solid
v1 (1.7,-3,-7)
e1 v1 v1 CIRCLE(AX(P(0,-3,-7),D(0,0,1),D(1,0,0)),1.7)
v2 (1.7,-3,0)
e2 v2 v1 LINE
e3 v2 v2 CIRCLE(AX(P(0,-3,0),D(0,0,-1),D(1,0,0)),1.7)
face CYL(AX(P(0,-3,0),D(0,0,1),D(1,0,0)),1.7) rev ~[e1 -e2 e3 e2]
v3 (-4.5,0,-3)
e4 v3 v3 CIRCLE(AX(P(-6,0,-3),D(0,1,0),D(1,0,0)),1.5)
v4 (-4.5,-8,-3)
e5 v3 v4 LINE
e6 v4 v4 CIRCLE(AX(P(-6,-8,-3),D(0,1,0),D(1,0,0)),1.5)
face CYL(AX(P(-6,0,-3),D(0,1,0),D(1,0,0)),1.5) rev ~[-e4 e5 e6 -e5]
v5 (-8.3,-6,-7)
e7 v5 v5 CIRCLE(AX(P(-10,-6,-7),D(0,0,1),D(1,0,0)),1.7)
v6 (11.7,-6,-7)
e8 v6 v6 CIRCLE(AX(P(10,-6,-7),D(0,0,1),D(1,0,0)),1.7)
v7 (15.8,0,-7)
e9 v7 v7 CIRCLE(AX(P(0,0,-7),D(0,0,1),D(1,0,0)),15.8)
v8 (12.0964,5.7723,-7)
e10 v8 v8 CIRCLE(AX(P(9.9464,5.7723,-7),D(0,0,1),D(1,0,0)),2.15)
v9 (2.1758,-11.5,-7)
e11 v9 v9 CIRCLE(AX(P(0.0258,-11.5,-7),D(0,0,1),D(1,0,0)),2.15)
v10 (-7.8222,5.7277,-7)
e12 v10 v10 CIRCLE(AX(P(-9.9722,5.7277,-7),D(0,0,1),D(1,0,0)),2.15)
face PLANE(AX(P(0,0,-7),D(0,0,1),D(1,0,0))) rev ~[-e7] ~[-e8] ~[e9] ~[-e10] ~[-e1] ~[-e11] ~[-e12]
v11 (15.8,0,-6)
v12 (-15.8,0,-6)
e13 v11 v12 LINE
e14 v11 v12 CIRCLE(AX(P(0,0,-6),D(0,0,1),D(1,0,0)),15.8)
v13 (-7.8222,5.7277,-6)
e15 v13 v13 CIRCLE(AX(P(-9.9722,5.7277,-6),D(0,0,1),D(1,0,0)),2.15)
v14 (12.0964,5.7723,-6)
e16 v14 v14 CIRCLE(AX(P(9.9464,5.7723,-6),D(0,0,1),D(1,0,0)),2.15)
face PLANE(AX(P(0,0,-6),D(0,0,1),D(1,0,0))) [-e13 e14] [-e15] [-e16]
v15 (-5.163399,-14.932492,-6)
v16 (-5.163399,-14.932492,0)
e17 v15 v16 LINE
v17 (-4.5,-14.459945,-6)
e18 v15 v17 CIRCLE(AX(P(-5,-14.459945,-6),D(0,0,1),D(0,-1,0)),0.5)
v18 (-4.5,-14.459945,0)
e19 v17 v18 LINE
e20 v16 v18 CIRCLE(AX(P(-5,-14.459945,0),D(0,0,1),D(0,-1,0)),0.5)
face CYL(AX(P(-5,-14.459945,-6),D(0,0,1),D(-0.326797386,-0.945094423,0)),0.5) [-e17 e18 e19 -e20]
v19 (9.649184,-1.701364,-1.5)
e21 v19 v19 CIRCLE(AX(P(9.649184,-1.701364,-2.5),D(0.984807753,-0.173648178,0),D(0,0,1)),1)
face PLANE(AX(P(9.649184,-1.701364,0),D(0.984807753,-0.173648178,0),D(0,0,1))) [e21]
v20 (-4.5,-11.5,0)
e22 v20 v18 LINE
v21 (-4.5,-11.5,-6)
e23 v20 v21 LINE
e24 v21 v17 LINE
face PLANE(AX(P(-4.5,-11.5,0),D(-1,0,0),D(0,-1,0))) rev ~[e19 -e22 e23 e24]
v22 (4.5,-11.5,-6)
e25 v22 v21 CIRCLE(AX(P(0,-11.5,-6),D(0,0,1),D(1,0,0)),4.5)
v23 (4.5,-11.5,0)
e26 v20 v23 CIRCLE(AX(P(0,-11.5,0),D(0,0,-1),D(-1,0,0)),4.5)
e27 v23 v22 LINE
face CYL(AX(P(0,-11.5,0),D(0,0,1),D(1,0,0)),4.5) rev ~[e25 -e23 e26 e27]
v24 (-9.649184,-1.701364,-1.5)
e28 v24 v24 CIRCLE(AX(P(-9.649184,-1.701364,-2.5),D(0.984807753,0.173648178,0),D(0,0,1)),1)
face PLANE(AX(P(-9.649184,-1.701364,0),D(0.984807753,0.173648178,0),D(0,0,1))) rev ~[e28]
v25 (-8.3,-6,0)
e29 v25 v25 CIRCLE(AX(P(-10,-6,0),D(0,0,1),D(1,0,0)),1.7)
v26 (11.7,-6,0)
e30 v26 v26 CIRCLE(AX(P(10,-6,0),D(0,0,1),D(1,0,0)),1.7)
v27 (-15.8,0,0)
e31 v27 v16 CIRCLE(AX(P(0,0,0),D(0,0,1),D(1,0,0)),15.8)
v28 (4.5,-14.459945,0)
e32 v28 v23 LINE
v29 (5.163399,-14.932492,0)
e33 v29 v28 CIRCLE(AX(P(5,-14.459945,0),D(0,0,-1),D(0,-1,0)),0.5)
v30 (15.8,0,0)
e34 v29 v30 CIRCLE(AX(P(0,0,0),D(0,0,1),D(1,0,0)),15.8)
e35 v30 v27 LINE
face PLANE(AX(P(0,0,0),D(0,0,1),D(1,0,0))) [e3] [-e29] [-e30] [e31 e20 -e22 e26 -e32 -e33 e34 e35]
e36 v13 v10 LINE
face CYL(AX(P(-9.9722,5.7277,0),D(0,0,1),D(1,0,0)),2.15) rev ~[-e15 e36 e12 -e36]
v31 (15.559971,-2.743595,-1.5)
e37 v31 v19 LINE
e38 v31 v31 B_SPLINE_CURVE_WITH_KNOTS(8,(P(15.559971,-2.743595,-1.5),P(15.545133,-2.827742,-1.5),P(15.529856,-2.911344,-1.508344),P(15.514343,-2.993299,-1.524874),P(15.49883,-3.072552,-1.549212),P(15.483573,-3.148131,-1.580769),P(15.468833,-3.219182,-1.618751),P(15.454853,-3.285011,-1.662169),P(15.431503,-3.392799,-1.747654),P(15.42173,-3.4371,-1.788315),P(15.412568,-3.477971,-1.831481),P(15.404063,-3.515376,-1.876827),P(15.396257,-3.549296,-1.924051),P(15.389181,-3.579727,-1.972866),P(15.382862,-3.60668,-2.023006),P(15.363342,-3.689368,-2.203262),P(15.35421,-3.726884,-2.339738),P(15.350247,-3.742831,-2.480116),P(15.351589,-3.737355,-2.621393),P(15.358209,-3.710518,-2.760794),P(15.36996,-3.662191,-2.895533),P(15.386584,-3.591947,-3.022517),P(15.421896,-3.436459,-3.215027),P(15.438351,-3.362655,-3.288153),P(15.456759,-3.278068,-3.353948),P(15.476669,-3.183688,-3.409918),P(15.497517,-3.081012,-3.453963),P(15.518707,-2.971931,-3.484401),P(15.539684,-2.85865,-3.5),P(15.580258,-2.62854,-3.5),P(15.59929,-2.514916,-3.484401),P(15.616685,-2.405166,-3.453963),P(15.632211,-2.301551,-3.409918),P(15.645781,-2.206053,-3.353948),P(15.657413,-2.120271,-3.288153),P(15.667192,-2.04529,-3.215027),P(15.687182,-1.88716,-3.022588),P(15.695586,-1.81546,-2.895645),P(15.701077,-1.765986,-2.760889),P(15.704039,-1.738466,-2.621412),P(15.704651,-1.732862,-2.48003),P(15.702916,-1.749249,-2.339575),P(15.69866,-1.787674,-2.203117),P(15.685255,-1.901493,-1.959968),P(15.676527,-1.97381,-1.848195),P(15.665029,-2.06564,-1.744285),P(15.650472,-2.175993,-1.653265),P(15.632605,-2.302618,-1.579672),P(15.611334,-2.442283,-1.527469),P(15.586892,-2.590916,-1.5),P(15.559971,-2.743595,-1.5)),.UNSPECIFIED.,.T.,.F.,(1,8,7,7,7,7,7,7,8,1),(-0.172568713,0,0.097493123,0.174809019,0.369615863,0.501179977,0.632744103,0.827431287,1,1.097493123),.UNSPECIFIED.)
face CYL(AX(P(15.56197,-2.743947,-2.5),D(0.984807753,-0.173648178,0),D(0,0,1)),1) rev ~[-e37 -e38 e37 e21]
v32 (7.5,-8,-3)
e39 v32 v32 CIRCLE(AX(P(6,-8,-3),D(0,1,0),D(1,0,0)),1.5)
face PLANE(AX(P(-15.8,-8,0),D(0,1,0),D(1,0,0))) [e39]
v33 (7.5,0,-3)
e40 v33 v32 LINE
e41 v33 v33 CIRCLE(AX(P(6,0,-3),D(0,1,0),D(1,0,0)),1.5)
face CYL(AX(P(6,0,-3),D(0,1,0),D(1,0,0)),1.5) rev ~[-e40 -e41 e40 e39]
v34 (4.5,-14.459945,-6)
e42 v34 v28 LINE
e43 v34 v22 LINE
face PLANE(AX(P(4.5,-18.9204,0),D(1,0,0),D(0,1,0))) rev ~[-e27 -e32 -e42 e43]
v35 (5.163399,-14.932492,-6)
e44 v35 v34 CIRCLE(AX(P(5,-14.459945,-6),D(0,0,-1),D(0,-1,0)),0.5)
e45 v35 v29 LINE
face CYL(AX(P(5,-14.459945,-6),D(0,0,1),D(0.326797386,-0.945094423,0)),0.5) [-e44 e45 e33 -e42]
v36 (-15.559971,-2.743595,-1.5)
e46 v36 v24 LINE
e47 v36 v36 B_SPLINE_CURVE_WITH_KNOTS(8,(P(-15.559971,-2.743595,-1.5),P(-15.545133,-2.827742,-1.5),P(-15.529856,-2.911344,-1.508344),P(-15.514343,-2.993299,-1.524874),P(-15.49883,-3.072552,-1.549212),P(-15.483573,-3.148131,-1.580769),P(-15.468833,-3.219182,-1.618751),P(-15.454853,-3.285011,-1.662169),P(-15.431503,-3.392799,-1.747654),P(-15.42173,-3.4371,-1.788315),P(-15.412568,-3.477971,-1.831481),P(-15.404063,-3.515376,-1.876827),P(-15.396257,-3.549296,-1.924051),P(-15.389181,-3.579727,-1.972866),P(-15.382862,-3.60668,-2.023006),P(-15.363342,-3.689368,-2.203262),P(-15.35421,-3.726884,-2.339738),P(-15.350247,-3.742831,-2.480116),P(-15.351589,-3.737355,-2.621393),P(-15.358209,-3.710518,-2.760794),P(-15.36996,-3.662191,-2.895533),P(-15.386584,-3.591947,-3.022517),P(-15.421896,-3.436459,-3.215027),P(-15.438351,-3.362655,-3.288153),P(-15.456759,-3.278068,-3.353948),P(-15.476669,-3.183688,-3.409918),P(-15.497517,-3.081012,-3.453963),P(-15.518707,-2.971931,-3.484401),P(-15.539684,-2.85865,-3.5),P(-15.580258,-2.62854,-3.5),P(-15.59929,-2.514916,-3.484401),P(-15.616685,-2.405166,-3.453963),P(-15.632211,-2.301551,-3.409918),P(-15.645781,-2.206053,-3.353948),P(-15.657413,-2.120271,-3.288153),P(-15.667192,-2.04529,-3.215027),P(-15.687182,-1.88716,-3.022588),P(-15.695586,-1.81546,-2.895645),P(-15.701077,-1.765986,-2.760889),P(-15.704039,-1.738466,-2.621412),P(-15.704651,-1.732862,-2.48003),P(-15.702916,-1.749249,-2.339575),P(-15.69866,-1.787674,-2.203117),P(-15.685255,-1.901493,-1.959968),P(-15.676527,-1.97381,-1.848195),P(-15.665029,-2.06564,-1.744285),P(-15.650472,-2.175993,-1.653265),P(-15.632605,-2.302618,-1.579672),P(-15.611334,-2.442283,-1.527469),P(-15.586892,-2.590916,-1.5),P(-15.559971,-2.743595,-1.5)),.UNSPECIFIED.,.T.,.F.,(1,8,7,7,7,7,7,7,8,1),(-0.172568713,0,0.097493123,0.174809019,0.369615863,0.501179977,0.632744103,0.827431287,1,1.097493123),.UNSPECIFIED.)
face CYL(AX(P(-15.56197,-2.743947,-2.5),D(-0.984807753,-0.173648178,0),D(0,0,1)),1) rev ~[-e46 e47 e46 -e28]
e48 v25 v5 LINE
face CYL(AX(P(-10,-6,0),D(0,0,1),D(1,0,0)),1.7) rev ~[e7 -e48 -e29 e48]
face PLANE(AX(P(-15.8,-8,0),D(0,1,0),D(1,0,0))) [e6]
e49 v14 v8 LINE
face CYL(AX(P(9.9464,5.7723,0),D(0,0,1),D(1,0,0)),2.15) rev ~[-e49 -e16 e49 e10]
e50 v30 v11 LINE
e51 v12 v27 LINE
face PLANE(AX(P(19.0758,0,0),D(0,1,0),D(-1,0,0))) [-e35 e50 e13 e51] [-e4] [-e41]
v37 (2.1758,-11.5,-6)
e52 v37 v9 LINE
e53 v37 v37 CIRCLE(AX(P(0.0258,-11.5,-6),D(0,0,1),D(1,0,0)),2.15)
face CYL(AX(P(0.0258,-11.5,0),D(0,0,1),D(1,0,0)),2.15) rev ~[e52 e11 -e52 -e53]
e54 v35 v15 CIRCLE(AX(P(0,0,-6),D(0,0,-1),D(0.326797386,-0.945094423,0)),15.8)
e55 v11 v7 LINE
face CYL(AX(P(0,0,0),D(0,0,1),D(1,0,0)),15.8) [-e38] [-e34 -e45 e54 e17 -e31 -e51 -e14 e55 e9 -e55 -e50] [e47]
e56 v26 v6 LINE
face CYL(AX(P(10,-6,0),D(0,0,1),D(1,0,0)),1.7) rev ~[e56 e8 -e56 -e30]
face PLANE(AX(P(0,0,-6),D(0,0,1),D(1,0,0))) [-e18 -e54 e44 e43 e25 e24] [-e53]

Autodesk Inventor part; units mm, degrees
ref_plane "XZ Plane" through (0, 0, 0) normal (0, 1, 0) x (-1, 0, 0)
sketch "スケッチ2" plane through (0, 0, 0) normal (0, 0, 1) x (1, 0, 0)
  circle A0 centre (0, 0) radius 15.8
  dimension "d0" = 31.6
extrude "押し出し1" add sketch "スケッチ2" against normal blind 7
sketch "スケッチ4" plane through (0, 0, 0) normal (0, 0, 1) x (1, 0, 0)
  circle A0 centre (0.0258, -11.5) radius 2.15
  circle A1 centre (9.9464, 5.7723) radius 2.15
  circle A2 centre (-9.9722, 5.7277) radius 2.15
  point P0 (0, 0)
  dimension "d8" = 4.3
  dimension "d9" = 11.5
  dimension "d12" = 360
extrude "押し出し3" cut sketch "スケッチ4" against normal through all
sketch "スケッチ9" plane through (0, 0, 0) normal (0, 0, 1) x (1, 0, 0)
  line L0 (4.5, -18.9204) -> (4.5, -11.5)
  line L1 (0, -7) -> (0, -7)
  line L2 (-4.5, -11.5) -> (-4.5, -18.9204)
  line L3 (-4.5, -18.9204) -> (4.5, -18.9204)
  line L4 (0, 0) -> (0, -22.6433) construction
  arc A0 (4.5, -11.5) -> (0, -7) centre (0, -11.5) ccw
  arc A1 (0, -7) -> (-4.5, -11.5) centre (0, -11.5) ccw
  point P0 (4.5, -7)
  point P1 (-4.5, -7)
  point P2 (0, -7)
  point P3 (0, -7)
  dimension "d55" = 9
  dimension "d56" = 7
  dimension "d57" = 4.5
extrude "押し出し7" cut sketch "スケッチ9" against normal blind 6
fillet "フィレット1" radius 0.5 2 edges at (4.5, -15.1456, -3) (-4.5, -15.1456, -3)
sketch "スケッチ13" plane through (0, 0, 0) normal (0, 0, 1) x (1, 0, 0)
  circle A0 centre (-10, -6) radius 1.7
  circle A1 centre (10, -6) radius 1.7
  circle A2 centre (0, -3) radius 1.7
  line L0 (0, 0) -> (0, -19.4065)
  line L1 (0, 0) -> (20.4623, 0)
  point P0 (0, -4.7)
  point P1 (0, -1.3)
  dimension "d125" = 3.4
  dimension "d126" = 3.4
  dimension "d127" = 3.4
  dimension "d128" = 6
  dimension "d129" = 3
  dimension "d130" = 10
extrude "押し出し11" cut sketch "スケッチ13" against normal through all
ref_plane "作業平面6" through (0, 0, 0) normal (0.9848078, -0.1736482, 0) x (0, 0, 1)
ref_plane "作業平面7" through (0, 0, 0) normal (0.9848078, 0.1736482, 0) x (0, 0, 1)
ref_plane "作業平面8" through (15.56, -2.7436, 0) normal (0.9848078, -0.1736482, 0) x (0, 0, 1)
ref_plane "作業平面9" through (-15.56, -2.7436, 0) normal (0.9848078, 0.1736482, 0) x (0, 0, 1)
sketch "スケッチ15" plane through (15.56, -2.7436, 0) normal (0.9848078, -0.1736482, 0) x (0, 0, 1)
  circle A0 centre (-2.5, 0) radius 1
  point P0 (0, 0)
  dimension "d103" = 2
  dimension "d104" = 2.5
sketch "スケッチ16" plane through (-15.56, -2.7436, 0) normal (0.9848078, 0.1736482, 0) x (0, 0, 1)
  circle A0 centre (-2.5, 0) radius 1
  point P0 (0, 0)
  dimension "d105" = 2
  dimension "d106" = 2.5
extrude "押し出し12" cut sketch "スケッチ16" along normal blind 6
extrude "押し出し13" cut sketch "スケッチ15" against normal blind 6
thread "ねじ10" size "M2x0.4" class "6H" standard "ANSI Metric M Profile" full length
thread "ねじ11" size "M2x0.4" class "6H" standard "ANSI Metric M Profile" full length
sketch "スケッチ18" plane through (0, 0, 0) normal (0, 0, 1) x (1, 0, 0)
  line L0 (-18.9802, 17.2113) -> (19.0758, 17.2113)
  line L1 (19.0758, 17.2113) -> (19.0758, 0)
  line L2 (19.0758, 0) -> (-18.9802, 0)
  line L3 (-18.9802, 0) -> (-18.9802, 17.2113)
  point P0 (0, 0)
  point P1 (0.0478, 0)
  dimension "d141" = 0
extrude "押し出し15" cut sketch "スケッチ18" against normal blind 6
sketch "スケッチ20" plane through (-15.8, 0, 0) normal (0, 1, 0) x (1, 0, 0)
  line L0 (15.8, 0) -> (15.8, 8.7821) construction
  line L1 (0, 0) -> (0, 6) projected
  line L2 (0, 3) -> (33.9854, 3) construction
  circle A0 centre (9.8, 3) radius 1.5
  circle A1 centre (21.8, 3) radius 1.5
  line L3 (31.6, 0) -> (0, 0) projected
  dimension "d132" = 3
  dimension "d133" = 3
  dimension "d134" = 6
extrude "押し出し16" cut sketch "スケッチ20" against normal blind 8
thread "ねじ13" size "M3x0.5" class "6H" standard "ANSI Metric M Profile" full length
thread "ねじ14" size "M3x0.5" class "6H" standard "ANSI Metric M Profile" full length
properties part number "B_probehead_5" material "ステンレス鋼 440C"
